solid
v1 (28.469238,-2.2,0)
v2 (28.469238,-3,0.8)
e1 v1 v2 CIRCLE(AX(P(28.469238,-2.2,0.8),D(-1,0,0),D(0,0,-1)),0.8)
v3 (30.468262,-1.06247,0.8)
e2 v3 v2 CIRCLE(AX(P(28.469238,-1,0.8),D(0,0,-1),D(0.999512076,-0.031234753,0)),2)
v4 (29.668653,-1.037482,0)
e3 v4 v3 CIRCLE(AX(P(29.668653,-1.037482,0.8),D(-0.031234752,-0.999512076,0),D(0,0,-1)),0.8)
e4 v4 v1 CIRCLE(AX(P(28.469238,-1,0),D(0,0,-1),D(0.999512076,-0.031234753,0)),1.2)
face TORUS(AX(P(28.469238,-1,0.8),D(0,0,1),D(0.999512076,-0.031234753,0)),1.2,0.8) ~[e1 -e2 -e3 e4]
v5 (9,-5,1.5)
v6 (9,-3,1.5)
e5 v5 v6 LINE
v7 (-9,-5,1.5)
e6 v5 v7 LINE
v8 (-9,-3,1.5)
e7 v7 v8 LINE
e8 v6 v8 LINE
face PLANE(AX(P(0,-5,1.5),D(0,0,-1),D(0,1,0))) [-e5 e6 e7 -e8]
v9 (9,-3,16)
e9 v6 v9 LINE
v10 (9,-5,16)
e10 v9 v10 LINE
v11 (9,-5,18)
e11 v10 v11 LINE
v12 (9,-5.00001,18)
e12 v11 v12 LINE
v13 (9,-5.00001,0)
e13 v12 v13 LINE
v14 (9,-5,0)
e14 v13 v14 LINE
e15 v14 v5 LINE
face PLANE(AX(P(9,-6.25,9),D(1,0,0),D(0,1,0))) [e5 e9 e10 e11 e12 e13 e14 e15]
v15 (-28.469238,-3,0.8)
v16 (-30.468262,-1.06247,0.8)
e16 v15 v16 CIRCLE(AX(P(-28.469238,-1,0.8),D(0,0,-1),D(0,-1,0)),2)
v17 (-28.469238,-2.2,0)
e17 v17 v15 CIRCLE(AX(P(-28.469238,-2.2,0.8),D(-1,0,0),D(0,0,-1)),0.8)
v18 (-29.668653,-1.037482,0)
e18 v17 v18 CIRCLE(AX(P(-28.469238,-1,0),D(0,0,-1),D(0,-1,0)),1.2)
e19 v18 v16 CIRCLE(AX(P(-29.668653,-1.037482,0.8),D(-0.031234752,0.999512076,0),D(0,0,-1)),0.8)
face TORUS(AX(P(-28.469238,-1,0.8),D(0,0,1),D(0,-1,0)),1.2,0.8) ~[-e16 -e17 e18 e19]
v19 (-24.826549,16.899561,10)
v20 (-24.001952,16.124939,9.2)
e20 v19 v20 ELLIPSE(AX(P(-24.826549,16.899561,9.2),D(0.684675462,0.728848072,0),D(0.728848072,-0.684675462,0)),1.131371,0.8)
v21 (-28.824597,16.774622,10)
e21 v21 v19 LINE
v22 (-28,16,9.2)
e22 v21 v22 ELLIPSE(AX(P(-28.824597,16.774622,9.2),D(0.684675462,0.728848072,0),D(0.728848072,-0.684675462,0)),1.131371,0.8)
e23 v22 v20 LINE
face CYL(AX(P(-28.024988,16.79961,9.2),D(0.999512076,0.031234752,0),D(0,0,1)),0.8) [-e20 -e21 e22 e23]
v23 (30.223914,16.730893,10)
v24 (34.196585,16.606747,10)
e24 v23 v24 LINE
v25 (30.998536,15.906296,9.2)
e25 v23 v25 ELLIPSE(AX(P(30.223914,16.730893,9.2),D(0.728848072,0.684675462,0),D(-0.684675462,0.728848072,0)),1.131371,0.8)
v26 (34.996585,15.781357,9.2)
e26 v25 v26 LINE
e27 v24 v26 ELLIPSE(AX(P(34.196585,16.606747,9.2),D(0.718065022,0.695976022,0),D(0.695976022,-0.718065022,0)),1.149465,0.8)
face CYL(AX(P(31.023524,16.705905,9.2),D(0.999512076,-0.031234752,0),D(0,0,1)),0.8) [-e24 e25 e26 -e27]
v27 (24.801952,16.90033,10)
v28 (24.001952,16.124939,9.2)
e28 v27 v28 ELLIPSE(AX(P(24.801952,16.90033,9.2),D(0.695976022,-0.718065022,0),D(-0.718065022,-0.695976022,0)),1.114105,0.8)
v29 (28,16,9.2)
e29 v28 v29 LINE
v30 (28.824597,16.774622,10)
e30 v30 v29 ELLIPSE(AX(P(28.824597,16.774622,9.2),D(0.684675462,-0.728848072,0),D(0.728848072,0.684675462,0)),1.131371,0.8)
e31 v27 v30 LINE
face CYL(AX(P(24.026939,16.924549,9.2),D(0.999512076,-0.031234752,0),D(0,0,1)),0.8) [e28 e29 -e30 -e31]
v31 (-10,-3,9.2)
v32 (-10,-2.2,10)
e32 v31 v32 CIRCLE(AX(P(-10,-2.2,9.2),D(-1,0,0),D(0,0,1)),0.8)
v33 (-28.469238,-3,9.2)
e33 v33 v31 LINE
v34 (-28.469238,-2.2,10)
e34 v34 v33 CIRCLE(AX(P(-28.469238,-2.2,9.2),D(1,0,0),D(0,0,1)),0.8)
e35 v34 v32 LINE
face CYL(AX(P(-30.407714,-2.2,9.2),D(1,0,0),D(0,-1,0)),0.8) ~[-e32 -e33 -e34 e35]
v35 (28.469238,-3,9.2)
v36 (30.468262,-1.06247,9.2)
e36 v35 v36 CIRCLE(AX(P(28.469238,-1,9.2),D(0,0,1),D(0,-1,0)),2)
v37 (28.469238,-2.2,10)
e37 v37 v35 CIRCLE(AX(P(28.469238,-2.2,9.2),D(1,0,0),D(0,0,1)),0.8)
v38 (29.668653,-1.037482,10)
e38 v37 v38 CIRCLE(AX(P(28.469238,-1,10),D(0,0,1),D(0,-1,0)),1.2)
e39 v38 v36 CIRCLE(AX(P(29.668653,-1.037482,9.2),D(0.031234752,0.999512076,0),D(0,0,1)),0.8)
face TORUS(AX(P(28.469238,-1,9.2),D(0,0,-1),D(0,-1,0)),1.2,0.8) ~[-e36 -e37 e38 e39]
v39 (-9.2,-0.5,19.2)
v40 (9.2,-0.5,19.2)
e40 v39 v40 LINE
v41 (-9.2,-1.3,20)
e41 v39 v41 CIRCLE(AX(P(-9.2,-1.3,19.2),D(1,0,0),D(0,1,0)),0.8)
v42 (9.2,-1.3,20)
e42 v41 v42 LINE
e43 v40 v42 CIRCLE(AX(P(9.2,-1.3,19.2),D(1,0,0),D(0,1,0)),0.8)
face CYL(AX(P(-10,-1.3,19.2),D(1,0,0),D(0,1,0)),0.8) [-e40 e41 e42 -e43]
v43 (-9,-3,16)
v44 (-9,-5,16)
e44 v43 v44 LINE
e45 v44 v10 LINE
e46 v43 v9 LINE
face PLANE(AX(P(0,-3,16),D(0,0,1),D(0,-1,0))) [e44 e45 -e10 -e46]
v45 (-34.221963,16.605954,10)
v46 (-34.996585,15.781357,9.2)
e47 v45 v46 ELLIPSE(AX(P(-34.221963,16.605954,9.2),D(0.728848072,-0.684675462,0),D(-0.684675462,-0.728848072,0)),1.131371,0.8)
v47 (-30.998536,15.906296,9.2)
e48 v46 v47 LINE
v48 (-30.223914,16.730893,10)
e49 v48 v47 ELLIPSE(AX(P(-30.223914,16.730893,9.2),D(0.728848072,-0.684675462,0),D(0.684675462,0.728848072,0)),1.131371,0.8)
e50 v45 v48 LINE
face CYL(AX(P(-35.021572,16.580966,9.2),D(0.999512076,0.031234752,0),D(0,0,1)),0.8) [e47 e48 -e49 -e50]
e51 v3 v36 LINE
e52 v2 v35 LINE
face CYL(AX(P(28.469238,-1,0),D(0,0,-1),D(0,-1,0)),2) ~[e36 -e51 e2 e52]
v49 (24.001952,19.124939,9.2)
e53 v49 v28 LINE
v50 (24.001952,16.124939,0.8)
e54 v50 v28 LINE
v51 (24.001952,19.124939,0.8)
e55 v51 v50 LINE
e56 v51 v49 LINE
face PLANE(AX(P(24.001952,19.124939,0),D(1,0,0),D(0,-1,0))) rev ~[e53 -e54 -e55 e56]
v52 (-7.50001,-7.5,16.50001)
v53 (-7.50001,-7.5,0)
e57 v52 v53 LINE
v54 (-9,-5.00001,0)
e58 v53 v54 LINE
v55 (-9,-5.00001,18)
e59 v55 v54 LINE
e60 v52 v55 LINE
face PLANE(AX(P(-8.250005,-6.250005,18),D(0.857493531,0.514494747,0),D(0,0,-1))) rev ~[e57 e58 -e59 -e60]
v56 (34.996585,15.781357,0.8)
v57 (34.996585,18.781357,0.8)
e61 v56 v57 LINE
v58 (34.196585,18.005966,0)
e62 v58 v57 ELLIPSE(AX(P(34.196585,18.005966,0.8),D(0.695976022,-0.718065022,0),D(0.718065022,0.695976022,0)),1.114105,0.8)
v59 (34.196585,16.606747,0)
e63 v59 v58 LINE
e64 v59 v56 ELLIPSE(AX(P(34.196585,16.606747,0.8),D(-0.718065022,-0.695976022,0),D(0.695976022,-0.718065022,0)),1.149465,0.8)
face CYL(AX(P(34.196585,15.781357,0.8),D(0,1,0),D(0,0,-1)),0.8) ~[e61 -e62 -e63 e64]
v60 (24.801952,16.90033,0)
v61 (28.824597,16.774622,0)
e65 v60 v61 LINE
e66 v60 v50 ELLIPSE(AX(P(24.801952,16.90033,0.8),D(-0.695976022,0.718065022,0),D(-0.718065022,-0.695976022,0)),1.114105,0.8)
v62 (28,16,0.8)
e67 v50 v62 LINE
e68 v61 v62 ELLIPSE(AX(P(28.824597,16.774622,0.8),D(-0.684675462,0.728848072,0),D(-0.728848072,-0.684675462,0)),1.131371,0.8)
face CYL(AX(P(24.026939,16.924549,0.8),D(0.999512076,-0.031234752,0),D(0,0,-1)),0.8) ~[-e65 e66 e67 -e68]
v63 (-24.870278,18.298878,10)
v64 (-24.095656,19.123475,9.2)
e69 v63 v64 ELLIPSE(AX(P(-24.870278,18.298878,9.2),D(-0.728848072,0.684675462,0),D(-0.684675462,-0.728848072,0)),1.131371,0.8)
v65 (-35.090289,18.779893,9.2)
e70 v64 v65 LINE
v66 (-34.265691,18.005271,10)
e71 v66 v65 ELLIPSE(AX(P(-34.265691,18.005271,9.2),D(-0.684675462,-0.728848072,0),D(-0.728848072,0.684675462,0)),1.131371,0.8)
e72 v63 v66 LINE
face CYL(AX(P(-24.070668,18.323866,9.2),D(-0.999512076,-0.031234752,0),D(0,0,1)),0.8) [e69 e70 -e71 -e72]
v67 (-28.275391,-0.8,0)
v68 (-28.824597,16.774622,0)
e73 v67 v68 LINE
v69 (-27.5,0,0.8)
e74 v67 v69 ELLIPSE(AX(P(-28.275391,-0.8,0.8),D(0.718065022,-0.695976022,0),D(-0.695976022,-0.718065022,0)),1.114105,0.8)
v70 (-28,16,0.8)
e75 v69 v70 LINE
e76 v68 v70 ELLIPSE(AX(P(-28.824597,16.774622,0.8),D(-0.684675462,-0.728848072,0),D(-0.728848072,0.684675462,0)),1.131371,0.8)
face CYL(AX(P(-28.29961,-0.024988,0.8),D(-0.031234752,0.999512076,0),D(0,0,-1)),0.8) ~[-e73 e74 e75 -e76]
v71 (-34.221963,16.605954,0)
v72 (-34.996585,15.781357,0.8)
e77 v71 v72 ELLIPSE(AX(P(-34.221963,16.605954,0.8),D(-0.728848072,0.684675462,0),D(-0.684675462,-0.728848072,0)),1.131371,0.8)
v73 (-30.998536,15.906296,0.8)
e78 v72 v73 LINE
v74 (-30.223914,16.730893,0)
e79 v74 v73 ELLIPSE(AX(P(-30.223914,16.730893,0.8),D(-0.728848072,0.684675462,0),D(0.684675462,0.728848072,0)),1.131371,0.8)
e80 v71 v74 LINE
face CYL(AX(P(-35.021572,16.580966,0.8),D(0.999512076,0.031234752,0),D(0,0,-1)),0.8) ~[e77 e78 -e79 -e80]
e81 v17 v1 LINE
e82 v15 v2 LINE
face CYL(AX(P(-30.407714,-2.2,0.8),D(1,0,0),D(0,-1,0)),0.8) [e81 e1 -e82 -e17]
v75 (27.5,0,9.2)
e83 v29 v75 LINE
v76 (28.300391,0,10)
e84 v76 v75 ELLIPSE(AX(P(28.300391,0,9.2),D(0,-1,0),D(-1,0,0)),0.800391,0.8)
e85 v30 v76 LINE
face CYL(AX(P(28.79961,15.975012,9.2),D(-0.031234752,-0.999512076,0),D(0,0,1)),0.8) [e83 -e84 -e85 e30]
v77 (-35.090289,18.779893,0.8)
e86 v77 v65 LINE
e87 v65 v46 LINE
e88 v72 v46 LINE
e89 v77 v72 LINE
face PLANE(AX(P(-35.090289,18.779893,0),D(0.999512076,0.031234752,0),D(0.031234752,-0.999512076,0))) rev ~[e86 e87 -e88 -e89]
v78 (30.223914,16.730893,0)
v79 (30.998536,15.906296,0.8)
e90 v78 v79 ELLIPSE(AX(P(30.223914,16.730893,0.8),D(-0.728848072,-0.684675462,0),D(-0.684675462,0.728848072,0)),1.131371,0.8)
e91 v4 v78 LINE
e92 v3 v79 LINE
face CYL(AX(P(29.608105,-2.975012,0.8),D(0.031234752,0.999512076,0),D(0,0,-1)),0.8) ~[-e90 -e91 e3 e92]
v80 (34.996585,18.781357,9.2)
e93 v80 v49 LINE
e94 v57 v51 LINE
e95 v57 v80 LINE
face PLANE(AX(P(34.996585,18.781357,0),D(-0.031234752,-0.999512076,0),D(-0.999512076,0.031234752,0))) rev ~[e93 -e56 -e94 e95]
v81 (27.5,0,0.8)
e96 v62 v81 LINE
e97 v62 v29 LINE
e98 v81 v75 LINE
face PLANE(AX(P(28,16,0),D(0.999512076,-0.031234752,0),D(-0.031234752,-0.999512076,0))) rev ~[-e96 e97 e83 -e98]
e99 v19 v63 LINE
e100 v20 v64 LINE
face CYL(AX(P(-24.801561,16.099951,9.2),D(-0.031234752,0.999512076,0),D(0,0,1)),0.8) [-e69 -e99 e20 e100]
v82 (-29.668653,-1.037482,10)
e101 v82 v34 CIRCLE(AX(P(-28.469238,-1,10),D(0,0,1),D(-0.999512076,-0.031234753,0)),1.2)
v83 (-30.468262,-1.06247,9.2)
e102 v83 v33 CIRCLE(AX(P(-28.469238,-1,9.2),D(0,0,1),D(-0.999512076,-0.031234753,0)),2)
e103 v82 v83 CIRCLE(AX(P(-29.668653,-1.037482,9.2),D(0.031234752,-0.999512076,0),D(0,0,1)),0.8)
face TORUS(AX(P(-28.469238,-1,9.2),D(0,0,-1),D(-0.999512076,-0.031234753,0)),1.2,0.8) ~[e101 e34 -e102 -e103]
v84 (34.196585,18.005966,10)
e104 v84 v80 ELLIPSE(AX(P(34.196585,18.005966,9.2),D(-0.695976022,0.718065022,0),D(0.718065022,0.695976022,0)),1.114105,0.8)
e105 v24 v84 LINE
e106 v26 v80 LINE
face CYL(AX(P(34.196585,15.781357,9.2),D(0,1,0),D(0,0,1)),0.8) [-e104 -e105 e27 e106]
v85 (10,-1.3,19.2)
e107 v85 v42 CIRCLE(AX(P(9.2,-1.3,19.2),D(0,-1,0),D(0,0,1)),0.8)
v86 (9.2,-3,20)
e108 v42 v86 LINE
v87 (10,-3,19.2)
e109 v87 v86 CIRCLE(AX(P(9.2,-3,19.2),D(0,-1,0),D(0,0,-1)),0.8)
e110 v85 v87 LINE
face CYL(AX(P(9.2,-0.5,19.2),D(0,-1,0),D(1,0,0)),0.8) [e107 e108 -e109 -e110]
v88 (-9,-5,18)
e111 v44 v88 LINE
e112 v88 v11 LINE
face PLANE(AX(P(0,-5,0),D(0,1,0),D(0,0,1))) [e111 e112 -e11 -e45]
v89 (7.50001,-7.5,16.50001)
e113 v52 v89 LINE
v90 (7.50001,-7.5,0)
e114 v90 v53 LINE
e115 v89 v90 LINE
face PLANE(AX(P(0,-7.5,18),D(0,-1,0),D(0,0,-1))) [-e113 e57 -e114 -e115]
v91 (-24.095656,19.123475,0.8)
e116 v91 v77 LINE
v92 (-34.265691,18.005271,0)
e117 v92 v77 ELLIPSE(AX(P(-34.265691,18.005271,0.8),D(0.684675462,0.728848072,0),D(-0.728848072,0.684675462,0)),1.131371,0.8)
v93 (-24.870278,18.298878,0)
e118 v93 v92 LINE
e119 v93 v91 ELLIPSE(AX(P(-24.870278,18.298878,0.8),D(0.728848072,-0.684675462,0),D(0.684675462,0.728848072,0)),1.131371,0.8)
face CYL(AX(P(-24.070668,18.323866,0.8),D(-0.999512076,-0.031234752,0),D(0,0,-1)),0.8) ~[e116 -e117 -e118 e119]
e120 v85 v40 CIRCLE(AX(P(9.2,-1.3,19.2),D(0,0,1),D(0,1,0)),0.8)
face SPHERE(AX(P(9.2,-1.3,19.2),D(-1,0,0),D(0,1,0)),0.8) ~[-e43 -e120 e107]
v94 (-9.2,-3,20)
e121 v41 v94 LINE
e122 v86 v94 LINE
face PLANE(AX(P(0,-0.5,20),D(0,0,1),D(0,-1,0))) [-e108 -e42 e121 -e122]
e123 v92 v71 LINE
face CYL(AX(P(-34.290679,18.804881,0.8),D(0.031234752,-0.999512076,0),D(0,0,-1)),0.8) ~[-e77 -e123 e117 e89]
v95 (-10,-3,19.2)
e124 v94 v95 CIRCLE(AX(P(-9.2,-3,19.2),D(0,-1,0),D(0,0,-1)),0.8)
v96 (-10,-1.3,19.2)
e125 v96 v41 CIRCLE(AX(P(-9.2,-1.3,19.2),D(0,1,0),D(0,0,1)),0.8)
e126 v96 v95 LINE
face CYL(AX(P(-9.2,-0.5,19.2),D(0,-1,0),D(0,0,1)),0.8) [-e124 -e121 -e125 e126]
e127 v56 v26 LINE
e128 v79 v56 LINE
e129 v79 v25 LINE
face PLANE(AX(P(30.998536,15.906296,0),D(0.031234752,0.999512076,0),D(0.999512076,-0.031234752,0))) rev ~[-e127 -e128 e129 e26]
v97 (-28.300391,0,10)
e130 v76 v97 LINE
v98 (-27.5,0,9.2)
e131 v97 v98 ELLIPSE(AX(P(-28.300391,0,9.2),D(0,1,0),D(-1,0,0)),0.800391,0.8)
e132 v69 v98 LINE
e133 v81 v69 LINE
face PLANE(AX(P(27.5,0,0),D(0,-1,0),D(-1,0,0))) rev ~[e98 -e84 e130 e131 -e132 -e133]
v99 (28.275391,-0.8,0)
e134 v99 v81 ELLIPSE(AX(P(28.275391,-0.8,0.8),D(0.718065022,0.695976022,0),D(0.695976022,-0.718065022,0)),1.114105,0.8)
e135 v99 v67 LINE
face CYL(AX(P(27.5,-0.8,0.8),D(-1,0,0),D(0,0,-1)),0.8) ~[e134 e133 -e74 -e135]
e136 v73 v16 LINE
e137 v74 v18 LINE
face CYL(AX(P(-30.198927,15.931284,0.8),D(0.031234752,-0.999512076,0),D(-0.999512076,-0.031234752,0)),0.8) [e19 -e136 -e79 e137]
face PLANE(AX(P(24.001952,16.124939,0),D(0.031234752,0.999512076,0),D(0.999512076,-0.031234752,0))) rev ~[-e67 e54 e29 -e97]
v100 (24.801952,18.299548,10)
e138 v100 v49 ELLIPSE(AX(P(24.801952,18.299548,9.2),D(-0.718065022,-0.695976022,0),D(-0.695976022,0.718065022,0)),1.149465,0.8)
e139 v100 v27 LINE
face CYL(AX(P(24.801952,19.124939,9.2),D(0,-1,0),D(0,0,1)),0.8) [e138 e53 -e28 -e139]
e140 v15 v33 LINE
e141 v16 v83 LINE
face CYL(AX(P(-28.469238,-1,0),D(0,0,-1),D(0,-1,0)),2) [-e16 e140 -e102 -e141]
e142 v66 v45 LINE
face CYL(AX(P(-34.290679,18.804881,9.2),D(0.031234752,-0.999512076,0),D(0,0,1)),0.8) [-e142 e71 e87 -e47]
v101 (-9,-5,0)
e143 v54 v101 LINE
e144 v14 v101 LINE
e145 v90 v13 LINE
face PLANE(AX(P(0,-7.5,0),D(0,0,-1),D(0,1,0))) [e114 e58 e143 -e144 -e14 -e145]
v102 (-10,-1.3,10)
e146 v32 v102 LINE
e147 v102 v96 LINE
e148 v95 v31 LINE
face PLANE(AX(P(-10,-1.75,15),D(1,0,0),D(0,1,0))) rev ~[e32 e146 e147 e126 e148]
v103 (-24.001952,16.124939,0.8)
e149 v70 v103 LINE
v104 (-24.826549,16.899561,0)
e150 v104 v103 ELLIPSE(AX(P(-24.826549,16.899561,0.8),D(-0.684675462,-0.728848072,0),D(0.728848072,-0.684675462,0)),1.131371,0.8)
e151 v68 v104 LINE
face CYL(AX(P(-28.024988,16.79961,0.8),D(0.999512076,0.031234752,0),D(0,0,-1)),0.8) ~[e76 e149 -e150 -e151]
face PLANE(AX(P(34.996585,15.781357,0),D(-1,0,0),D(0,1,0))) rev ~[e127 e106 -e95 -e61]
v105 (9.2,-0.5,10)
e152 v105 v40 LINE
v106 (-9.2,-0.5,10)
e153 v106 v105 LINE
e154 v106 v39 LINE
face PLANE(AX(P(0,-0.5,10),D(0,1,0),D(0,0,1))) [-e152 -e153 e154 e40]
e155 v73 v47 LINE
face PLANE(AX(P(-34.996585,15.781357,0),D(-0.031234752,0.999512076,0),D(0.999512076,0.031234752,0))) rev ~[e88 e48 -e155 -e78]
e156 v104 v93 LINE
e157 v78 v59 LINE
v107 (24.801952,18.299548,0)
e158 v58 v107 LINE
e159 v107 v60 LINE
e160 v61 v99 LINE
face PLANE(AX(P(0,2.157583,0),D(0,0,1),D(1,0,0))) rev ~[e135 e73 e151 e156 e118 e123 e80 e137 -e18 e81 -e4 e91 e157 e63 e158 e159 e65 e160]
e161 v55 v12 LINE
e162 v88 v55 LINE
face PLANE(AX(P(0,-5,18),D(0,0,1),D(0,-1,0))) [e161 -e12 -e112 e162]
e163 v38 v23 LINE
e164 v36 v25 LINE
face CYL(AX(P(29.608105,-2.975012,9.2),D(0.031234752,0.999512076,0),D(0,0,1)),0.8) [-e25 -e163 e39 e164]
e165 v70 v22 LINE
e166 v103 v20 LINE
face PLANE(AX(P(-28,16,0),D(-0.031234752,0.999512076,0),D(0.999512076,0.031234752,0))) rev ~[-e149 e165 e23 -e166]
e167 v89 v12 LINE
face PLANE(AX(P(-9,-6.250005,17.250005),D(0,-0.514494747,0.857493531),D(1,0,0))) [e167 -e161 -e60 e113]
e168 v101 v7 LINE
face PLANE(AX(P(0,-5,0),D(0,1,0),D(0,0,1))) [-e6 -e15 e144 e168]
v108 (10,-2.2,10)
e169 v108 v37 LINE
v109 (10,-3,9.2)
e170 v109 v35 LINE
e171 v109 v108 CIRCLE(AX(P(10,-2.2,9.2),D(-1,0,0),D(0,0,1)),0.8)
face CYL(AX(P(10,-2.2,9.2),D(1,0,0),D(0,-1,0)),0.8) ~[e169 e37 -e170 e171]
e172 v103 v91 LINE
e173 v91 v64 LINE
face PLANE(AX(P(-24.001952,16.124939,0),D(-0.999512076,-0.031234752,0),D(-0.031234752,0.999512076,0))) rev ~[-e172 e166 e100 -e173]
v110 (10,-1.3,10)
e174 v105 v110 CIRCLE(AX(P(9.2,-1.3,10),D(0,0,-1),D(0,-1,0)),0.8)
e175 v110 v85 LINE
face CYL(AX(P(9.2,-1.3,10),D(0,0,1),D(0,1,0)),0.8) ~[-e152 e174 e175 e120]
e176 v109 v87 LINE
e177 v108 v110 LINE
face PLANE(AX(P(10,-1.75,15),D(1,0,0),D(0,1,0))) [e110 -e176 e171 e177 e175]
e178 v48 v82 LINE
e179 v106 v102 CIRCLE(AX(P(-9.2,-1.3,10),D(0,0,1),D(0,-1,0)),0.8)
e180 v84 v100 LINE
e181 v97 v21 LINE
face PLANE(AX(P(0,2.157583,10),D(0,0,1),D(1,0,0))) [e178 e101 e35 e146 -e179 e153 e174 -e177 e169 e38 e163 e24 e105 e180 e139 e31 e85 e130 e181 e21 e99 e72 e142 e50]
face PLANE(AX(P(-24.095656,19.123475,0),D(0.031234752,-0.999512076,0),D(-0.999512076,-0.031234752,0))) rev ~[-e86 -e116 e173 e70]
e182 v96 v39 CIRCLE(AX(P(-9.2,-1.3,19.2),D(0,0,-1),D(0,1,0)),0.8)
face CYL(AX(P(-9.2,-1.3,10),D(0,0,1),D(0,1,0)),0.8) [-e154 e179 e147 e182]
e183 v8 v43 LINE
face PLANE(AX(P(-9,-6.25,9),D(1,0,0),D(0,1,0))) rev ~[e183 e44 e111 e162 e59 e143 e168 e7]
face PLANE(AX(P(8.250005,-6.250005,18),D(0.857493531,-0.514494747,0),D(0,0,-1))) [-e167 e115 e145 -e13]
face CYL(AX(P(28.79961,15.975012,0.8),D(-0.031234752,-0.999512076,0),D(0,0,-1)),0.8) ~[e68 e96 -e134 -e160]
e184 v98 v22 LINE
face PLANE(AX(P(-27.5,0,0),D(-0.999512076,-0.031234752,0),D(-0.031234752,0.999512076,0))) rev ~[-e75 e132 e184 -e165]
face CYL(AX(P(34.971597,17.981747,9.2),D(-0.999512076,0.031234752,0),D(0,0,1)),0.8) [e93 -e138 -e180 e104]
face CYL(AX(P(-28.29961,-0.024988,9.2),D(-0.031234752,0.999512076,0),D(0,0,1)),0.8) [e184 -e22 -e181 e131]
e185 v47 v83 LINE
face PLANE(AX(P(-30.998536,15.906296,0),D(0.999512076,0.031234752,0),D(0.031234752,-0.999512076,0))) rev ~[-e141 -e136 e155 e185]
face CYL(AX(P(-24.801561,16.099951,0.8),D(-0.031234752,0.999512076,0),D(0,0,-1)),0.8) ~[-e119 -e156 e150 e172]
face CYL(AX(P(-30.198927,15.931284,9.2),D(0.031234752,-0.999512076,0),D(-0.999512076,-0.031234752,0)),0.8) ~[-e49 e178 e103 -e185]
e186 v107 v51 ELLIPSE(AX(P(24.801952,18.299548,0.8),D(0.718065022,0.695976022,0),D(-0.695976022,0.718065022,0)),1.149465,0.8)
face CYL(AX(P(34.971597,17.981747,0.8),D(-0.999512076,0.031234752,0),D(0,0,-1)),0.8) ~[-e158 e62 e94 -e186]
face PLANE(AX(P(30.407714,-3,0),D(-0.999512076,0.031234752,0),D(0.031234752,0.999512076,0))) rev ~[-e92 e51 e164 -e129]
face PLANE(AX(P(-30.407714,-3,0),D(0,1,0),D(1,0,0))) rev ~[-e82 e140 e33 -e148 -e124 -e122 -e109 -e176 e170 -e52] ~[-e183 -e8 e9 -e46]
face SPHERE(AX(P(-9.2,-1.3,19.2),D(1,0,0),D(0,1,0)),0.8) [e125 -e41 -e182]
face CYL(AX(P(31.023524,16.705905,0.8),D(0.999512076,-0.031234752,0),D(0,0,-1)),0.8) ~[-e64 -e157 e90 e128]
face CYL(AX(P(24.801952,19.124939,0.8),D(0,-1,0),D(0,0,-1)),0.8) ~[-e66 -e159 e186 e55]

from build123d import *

# Parameters (mm, degrees)
F1_DEPTH      = 10
F3_DEPTH      = 10
F4_DEPTH      = 9
F5_DEPTH      = 9
F6_SIZE2      = 2.49999
F6_SIZE       = 1.49999
F7_R          = 0.8
F8_R          = 0.8
F9_R          = 0.8
F10_T1_DEPTH  = 10
F10_T4_ANGLE  = 88.2100893918
F10_T6_ANGLE  = 88.2100893918
F10_T8_ANGLE  = 88.2100893918
F10_T10_ANGLE = 88.2100893918


# Not quite as in the source:
# - a fillet or chamfer that OpenCascade refuses, or shapes differently, is made with other operations: its cross-section is extruded or revolved along the edge and cut away or added
# - a fillet or chamfer is up to 0.001 mm smaller than in the source, because OpenCascade refuses the exact size


with BuildPart() as f1:
    # F0 (on Top) → F1 (new body)
    with BuildSketch(Plane.XY):
        Polygon((27.5, 0), (-27.5, 0), (-28, 16), (-30.9985362283, 15.9062957429), (-30.4077144863, -3), (30.4077144863, -3), (30.9985362283, 15.9062957429), (28, 16), align=None)
        Polygon((-30.9985362283, 15.9062957429), (-28, 16), (-24.0019516957, 16.1249390095), (-24.0956559528, 19.1234752378), (-35.0902887897, 18.7798929616), (-34.9965845326, 15.7813567334), align=None)
        Polygon((24.0019516957, 16.1249390095), (28, 16), (30.9985362283, 15.9062957429), (34.9965845326, 15.7813567334), (34.9965845326, 18.7813567334), (24.0019516957, 19.1249390095), align=None)
    extrude(amount=F1_DEPTH)

    # F2 (on Right) → F3 (join, symmetric)
    with BuildSketch(Plane.YZ):
        Polygon((-3, 16), (-3, 10), (-0.5, 10), (-0.5, 20), (-3, 20), align=None)
    extrude(amount=F3_DEPTH, both=True)

    # F2 (on Right) → F4 (join, symmetric)
    with BuildSketch(Plane.YZ):
        Polygon((-3, 1.5), (-3, 10), (-3, 16), (-5, 16), (-5, 1.5), align=None)
    extrude(amount=F4_DEPTH, both=True)

    # F2 (on Right) → F5 (join, symmetric)
    with BuildSketch(Plane.YZ):
        Polygon((-5, 0), (-5, 1.5), (-5, 16), (-5, 18), (-7.5, 18), (-7.5, 0), align=None)
    extrude(amount=F5_DEPTH, both=True)

    # F6 (size 1.5 and 2.5 in the source; OpenCascade refuses exactly that, so slightly less here)
    f6_edges = [f1.edges().sort_by_distance(p)[0] for p in [
        (0, -7.5, 18),
        (-9, -7.5, 9),
        (9, -7.5, 9),
    ]]
    f6_side = f1.faces().sort_by_distance((0, -7.5, 9))[0]
    chamfer(f6_edges, length=F6_SIZE, length2=F6_SIZE2, reference=f6_side)

    # F7
    f7_edges = [f1.edges().sort_by_distance(p)[0] for p in [
        (27.75, 8, 0),
        (0, 0, 0),
        (-27.75, 8, 0),
        (-26.000976, 16.06247, 0),
        (-24.048804, 17.624207, 0),
        (-29.592972, 18.951684, 0),
        (-35.043437, 17.280625, 0),
        (-32.99756, 15.843826, 0),
        (-30.703125, 6.453148, 0),
        (0, -3, 0),
        (30.703125, 6.453148, 0),
        (32.99756, 15.843826, 0),
        (34.996585, 17.281357, 0),
        (29.499268, 18.953148, 0),
        (24.001952, 17.624939, 0),
        (26.000976, 16.06247, 0),
    ]]
    fillet(f7_edges, radius=F7_R)

    # F8
    f8_edges = [f1.edges().sort_by_distance(p)[0] for p in [
        (-29.592972, 18.951684, 10),
        (-35.043437, 17.280625, 10),
        (-32.99756, 15.843826, 10),
        (-26.000976, 16.06247, 10),
        (-24.048804, 17.624207, 10),
        (-27.75, 8, 10),
        (-30.703125, 6.453148, 10),
        (-20.203857, -3, 10),
        (20.203857, -3, 10),
        (30.703125, 6.453148, 10),
        (32.99756, 15.843826, 10),
        (34.996585, 17.281357, 10),
        (29.499268, 18.953148, 10),
        (24.001952, 17.624939, 10),
        (26.000976, 16.06247, 10),
        (27.75, 8, 10),
    ]]
    fillet(f8_edges, radius=F8_R)

    # F9
    f9_edges = [f1.edges().sort_by_distance(p)[0] for p in [
        (0, -0.5, 20),
        (-10, -0.5, 15),
        (10, -0.5, 15),
        (10, -1.75, 20),
        (-10, -1.75, 20),
    ]]
    fillet(f9_edges, radius=F9_R)

    # F10: fillet of radius 2 on 2 edges, made by hand

    # F10_s2 → F10_t1 (cut)
    with BuildSketch(Plane.XY):
        with BuildLine():
            ThreePointArc((-28.4692381621, -3), (-29.861190207, -2.4361300445), (-30.4682623143, -1.0624695048))
            Line((-30.4682623143, -1.0624695048), (-30.4077144863, -3))
            Line((-30.4077144863, -3), (-28.4692381621, -3))
        make_face()
        with BuildLine():
            ThreePointArc((28.4692381621, -3), (29.861190207, -2.4361300445), (30.4682623143, -1.0624695048))
            Line((30.4682623143, -1.0624695048), (30.4077144863, -3))
            Line((30.4077144863, -3), (28.4692381621, -3))
        make_face()
    extrude(amount=F10_T1_DEPTH, mode=Mode.SUBTRACT)

    # F10_s3 → F10_t4 (revolve, cut)
    with BuildSketch(Plane(origin=(-0.0034446457, -0.1102286623, 0), x_dir=(0, 0, 1), z_dir=(0.0312347524, 0.9995120761, 0))):
        with BuildLine():
            ThreePointArc((0, 29.6865820924), (0.2343145751, 30.2522675173), (0.8, 30.4865820924))
            Line((0.8, 30.4865820924), (0, 30.4865820924))
            Line((0, 30.4865820924), (0, 29.6865820924))
        make_face()
    revolve(axis=Axis((28.4692381621, -1, 0), (0, 0, -1)), revolution_arc=F10_T4_ANGLE, mode=Mode.SUBTRACT)

    # F10_s5 → F10_t6 (revolve, cut)
    with BuildSketch(Plane.YZ.offset(28.4692381621)):
        with BuildLine():
            ThreePointArc((-2.2, 10), (-2.7656854249, 9.7656854249), (-3, 9.2))
            Line((-3, 9.2), (-3, 10))
            Line((-3, 10), (-2.2, 10))
        make_face()
    revolve(axis=Axis((28.4692381621, -1, 10), (0, 0, 1)), revolution_arc=F10_T6_ANGLE, mode=Mode.SUBTRACT)

    # F10_s7 → F10_t8 (revolve, cut)
    with BuildSketch(Plane.YZ.offset(-28.4692381621)):
        with BuildLine():
            ThreePointArc((-2.2, 0), (-2.7656854249, 0.2343145751), (-3, 0.8))
            Line((-3, 0.8), (-3, 0))
            Line((-3, 0), (-2.2, 0))
        make_face()
    revolve(axis=Axis((-28.4692381621, -1, 0), (0, 0, -1)), revolution_arc=F10_T8_ANGLE, mode=Mode.SUBTRACT)

    # F10_s9 → F10_t10 (revolve, cut)
    with BuildSketch(Plane(origin=(0.0034446457, -0.1102286623, 0), x_dir=(0, 0, 1), z_dir=(-0.0312347524, 0.9995120761, 0))):
        with BuildLine():
            ThreePointArc((10, -29.6865820924), (9.7656854249, -30.2522675173), (9.2, -30.4865820924))
            Line((9.2, -30.4865820924), (10, -30.4865820924))
            Line((10, -30.4865820924), (10, -29.6865820924))
        make_face()
    revolve(axis=Axis((-28.4692381621, -1, 10), (0, 0, 1)), revolution_arc=F10_T10_ANGLE, mode=Mode.SUBTRACT)


solid = f1.part
